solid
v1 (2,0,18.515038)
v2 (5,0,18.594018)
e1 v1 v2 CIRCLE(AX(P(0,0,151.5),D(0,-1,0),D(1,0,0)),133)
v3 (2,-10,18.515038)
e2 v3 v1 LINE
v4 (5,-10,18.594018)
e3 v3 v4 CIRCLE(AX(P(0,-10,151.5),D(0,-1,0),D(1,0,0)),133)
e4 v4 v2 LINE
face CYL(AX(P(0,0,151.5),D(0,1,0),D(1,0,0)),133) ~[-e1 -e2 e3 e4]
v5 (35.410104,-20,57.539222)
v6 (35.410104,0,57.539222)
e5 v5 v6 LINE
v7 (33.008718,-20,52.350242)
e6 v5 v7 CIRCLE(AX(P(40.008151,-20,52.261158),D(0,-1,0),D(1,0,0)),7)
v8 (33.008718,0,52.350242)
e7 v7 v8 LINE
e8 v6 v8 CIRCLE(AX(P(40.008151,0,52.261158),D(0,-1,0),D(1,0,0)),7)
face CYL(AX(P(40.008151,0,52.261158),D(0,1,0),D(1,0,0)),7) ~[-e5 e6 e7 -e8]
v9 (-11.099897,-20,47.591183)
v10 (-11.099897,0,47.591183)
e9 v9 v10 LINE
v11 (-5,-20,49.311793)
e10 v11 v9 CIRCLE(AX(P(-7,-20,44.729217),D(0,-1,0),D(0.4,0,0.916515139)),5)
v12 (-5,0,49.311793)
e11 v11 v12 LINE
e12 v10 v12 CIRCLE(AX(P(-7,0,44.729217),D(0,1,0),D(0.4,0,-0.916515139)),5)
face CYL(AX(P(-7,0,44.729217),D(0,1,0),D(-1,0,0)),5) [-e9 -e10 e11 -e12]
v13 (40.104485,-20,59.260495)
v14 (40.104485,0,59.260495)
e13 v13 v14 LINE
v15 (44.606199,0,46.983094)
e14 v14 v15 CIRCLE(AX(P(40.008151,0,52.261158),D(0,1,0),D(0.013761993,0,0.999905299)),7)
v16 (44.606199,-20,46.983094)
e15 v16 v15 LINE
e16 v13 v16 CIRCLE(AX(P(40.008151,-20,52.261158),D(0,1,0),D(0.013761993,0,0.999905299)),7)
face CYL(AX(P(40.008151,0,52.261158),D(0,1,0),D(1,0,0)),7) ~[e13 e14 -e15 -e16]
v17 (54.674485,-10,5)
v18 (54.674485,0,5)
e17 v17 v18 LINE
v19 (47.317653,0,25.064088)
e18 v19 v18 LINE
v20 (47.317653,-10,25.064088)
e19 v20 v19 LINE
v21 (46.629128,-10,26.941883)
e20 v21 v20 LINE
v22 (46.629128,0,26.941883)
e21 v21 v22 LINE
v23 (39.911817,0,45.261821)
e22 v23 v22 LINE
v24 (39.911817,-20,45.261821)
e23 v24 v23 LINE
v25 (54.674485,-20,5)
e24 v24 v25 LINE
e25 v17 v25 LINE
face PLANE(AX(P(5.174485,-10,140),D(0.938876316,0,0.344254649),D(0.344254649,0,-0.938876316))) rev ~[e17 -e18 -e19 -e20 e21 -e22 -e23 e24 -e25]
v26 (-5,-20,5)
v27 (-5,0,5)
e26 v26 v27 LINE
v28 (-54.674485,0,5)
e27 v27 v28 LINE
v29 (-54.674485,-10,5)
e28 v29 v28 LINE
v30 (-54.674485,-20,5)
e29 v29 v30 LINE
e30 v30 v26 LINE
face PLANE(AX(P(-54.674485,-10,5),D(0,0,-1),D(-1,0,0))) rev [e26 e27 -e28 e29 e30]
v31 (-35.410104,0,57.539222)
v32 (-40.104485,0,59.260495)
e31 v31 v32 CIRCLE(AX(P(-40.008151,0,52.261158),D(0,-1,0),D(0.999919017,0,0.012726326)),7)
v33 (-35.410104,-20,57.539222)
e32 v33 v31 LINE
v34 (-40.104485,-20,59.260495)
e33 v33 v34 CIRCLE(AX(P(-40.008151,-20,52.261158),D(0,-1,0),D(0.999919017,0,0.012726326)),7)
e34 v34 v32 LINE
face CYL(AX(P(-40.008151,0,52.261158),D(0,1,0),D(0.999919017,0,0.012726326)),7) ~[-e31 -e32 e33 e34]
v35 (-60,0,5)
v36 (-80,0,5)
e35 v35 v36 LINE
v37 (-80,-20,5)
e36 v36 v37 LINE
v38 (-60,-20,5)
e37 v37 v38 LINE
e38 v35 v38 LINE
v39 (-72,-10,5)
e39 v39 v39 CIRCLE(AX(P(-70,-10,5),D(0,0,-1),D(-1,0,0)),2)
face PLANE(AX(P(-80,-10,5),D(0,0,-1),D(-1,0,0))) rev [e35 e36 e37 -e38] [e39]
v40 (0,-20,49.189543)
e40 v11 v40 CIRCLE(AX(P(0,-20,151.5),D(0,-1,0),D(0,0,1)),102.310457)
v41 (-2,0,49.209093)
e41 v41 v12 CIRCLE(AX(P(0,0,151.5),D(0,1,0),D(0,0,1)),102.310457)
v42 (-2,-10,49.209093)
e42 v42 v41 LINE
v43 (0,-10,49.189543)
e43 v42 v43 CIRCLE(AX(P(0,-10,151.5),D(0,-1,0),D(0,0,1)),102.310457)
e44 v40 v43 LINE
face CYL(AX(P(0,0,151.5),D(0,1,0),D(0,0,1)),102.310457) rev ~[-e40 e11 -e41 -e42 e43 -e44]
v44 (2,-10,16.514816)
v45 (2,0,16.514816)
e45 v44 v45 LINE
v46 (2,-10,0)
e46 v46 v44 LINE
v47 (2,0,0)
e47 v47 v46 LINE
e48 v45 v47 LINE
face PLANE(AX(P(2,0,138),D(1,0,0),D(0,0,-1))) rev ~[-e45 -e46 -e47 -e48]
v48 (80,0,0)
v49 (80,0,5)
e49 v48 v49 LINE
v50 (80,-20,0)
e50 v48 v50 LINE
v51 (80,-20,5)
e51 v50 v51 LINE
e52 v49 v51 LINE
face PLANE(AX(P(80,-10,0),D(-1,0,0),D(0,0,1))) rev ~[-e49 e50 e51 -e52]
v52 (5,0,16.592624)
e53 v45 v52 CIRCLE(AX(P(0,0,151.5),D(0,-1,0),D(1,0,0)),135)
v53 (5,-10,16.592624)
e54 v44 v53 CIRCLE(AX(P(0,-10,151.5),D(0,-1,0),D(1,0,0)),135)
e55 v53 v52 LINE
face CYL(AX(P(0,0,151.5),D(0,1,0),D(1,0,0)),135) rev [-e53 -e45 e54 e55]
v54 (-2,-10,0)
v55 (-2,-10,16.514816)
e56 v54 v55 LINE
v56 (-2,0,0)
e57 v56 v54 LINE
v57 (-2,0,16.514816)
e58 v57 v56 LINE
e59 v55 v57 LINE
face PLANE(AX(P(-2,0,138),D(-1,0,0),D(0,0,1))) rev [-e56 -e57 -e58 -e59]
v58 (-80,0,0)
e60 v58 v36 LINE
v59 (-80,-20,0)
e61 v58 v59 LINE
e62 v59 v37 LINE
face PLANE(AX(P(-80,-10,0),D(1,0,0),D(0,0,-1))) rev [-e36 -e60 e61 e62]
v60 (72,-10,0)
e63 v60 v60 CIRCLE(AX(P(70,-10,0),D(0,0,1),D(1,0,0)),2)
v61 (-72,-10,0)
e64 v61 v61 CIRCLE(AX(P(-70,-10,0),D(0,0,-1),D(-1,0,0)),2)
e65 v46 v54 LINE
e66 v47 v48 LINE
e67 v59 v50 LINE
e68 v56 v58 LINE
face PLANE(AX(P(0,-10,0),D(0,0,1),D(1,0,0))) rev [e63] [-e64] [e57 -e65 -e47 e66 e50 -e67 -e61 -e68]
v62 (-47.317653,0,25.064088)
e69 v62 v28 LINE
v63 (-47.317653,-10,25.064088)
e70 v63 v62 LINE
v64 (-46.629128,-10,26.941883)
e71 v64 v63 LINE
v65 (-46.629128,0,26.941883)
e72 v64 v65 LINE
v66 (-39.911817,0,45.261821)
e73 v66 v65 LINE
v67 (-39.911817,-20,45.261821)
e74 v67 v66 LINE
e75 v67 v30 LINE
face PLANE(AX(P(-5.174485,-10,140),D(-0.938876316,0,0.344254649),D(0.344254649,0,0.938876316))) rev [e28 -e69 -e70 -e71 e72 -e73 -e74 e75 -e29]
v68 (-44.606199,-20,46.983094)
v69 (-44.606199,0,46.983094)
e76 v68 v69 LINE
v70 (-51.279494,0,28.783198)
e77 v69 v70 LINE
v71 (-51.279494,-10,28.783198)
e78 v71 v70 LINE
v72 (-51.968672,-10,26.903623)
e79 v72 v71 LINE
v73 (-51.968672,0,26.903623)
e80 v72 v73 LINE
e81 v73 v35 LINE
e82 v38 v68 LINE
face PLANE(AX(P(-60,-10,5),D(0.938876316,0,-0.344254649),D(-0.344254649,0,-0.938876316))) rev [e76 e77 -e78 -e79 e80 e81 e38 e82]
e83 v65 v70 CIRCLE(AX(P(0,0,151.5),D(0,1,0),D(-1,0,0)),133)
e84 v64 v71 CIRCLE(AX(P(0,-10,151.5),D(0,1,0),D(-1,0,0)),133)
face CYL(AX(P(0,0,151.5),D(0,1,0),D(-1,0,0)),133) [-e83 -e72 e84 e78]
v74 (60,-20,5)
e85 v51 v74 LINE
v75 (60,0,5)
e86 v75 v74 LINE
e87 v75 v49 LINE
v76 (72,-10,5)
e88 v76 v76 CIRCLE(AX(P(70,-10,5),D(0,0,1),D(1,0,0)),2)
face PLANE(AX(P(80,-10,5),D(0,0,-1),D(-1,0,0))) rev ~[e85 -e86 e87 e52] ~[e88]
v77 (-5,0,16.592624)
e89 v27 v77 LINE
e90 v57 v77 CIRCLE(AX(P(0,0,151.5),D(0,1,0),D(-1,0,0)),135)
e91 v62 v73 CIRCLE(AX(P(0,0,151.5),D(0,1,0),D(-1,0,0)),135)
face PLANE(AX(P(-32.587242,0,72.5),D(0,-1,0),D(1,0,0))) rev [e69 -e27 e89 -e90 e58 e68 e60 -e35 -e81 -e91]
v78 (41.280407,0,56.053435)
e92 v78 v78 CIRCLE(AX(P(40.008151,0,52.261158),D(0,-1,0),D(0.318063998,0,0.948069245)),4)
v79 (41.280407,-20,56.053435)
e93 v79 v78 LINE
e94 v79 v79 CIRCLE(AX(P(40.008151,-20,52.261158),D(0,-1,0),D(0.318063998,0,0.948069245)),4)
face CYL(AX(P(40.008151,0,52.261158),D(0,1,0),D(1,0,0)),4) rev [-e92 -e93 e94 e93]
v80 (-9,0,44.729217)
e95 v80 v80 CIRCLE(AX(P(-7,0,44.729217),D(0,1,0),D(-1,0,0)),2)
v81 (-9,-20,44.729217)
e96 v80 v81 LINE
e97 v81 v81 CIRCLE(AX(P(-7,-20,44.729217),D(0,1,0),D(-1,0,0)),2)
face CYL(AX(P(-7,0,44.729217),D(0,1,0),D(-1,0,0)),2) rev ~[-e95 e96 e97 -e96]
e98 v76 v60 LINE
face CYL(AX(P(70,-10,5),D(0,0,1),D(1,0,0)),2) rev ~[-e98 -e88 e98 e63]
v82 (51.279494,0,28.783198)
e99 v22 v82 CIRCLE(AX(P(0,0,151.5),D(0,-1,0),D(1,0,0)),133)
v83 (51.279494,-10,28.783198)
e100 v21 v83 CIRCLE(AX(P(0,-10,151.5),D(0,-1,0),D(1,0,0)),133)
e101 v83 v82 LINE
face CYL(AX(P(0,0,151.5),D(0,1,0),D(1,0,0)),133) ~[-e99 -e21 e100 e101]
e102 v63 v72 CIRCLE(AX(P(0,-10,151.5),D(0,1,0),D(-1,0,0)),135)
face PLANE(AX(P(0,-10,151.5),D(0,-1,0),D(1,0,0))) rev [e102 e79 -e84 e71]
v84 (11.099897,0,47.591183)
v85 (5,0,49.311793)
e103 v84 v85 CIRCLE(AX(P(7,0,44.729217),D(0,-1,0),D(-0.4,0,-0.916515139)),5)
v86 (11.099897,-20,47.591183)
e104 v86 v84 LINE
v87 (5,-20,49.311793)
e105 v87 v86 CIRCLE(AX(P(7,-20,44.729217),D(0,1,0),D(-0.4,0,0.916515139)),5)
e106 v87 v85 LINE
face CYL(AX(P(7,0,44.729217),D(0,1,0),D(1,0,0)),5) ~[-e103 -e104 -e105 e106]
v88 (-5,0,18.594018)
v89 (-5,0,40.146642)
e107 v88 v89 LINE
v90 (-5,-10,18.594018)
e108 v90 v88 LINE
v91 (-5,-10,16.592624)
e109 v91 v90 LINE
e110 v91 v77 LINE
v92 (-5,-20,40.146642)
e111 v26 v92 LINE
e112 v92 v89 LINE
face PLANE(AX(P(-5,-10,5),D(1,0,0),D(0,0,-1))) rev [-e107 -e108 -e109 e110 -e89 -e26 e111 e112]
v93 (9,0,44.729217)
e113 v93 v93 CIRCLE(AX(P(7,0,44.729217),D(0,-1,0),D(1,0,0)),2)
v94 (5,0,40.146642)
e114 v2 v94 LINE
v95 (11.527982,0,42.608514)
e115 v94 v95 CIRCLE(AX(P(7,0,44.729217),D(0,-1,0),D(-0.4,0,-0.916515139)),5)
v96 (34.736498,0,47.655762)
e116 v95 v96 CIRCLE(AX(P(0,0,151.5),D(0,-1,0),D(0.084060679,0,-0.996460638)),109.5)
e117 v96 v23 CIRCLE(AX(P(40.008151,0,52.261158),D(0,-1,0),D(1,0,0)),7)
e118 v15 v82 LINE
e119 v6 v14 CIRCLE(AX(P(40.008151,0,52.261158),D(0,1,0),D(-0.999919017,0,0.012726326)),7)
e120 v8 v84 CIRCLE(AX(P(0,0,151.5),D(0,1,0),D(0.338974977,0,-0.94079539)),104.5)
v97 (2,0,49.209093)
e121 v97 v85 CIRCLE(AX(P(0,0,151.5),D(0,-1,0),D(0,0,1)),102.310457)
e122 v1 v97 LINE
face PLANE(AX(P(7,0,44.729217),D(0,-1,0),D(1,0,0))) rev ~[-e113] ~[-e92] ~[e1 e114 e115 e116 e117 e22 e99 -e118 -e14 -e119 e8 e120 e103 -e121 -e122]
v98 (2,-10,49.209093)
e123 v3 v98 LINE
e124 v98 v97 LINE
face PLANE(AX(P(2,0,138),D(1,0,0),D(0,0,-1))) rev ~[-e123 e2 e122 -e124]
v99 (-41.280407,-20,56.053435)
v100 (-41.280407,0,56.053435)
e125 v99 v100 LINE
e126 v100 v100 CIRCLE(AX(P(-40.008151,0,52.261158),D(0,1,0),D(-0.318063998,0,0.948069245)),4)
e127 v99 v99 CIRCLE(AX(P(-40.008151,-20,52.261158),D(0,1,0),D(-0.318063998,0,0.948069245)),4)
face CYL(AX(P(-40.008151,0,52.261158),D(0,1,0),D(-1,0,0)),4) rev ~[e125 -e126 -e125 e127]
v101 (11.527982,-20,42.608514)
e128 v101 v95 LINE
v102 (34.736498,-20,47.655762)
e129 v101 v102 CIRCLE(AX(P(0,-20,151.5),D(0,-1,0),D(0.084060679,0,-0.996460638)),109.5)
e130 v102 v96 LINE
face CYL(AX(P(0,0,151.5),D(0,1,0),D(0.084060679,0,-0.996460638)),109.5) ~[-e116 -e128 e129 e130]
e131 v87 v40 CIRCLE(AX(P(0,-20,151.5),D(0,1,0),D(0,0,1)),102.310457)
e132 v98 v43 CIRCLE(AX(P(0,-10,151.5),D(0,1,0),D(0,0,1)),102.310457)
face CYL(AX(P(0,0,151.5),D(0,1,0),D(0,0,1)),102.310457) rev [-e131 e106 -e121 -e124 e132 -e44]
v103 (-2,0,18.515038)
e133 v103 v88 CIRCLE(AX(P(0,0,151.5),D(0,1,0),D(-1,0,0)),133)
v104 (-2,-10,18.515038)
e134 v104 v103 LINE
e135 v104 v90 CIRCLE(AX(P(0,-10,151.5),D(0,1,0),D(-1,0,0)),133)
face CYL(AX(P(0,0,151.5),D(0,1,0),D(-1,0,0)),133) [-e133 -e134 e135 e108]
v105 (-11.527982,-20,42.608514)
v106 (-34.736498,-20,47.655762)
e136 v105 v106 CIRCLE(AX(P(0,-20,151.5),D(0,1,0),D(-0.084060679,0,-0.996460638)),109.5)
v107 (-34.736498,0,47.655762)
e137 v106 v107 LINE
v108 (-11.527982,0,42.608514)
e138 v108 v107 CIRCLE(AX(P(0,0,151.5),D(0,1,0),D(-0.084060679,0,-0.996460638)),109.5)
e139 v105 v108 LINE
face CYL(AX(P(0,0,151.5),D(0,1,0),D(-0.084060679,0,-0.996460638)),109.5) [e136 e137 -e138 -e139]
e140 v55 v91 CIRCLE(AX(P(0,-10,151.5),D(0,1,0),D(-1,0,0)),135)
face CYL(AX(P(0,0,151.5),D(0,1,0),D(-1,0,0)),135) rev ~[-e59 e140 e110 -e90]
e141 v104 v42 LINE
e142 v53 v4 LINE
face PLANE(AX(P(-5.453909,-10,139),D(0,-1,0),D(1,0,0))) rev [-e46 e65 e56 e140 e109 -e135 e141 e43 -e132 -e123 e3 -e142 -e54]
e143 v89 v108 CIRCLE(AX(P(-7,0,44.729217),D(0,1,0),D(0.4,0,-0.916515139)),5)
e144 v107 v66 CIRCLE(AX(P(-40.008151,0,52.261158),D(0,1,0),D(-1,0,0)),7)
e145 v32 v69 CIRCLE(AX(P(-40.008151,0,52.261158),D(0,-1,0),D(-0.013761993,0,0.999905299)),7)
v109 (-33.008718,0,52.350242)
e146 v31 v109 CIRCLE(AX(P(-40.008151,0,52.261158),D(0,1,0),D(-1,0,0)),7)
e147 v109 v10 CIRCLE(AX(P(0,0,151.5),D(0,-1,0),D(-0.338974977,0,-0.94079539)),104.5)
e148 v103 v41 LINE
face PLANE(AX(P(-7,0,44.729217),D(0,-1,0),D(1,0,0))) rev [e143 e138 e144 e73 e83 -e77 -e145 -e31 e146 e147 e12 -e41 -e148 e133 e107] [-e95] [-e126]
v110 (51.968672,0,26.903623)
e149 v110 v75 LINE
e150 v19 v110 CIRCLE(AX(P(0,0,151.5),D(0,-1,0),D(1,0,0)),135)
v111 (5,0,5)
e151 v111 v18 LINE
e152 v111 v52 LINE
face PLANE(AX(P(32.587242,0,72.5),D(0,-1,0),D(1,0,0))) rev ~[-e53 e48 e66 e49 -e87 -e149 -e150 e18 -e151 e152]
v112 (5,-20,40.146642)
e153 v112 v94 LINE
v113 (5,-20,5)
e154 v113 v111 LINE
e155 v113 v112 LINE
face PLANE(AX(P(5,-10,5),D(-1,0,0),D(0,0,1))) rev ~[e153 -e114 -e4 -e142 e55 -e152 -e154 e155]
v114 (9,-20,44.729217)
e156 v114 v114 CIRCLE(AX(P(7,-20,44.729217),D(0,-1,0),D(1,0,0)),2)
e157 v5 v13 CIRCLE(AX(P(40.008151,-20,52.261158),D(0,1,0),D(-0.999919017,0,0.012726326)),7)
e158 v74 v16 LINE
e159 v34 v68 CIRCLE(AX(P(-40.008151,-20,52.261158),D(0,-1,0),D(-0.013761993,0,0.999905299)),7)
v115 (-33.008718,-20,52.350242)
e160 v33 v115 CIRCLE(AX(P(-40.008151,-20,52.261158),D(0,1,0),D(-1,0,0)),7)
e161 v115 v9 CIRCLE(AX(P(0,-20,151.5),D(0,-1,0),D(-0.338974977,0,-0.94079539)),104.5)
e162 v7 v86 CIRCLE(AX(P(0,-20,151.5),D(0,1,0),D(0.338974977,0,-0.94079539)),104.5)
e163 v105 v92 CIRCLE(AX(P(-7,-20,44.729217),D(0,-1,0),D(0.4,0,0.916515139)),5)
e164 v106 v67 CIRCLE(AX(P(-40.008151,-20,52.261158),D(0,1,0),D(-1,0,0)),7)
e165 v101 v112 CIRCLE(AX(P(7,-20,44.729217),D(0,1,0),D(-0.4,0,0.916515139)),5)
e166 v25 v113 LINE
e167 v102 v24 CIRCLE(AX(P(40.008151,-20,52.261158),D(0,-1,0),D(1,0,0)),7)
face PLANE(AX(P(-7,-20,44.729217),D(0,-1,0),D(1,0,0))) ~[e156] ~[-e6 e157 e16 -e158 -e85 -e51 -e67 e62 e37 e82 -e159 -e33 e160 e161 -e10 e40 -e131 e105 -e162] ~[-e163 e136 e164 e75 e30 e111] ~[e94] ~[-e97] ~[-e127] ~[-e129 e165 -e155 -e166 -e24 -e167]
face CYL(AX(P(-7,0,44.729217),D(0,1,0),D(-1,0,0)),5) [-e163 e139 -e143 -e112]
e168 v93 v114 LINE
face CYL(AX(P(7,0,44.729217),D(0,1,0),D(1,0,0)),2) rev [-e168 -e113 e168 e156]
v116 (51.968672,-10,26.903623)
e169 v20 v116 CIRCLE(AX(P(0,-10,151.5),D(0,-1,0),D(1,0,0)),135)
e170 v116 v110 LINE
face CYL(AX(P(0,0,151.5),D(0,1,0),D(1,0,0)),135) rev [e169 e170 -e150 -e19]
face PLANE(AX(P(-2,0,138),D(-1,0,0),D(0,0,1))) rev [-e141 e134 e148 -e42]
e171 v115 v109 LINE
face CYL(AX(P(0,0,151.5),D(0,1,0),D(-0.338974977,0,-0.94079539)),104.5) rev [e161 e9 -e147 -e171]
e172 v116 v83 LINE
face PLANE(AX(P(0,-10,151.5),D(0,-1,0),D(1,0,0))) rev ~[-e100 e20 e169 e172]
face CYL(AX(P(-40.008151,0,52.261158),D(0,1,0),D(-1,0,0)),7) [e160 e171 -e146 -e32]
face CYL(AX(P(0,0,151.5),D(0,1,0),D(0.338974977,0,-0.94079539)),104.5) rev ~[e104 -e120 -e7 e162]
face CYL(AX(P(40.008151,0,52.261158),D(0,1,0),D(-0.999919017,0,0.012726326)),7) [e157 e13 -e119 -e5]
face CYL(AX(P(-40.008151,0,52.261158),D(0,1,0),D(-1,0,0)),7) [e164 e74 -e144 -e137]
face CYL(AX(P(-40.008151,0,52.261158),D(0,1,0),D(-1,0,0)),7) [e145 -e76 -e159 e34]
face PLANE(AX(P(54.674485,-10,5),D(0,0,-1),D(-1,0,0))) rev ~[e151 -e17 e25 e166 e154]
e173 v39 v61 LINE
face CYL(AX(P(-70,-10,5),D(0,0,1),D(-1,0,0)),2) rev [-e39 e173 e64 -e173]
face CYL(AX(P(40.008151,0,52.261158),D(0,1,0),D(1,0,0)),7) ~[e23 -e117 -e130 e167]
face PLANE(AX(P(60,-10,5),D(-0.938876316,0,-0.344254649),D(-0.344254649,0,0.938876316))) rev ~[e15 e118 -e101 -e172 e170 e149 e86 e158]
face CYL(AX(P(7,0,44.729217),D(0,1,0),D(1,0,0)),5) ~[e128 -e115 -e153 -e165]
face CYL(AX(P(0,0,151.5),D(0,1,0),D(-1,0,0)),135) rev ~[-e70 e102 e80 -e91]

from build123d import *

# Parameters (mm, degrees)
F1_W      = 80
F1_H      = 5
F2_DEPTH  = 10
F3_W      = 5
F3_H      = 151.5
F4_DEPTH  = 10
F5_W      = 21
F5_H      = 23
F6_DEPTH  = 10
F8_DEPTH  = 10
F10_DEPTH = 10
F12_DEPTH = 10
F14_DEPTH = 20
F15_W     = 0.9078182304
F15_H     = 2
F16_DEPTH = 10
F17_R     = 135
F17_R_2   = 133
F18_DEPTH = 10
F19_R     = 7
F19_R_2   = 4
F20_DEPTH = 20
F21_R     = 4
F22_DEPTH = 20.001
F23_R     = 5
F23_R_2   = 2
F24_DEPTH = 20
F26_DEPTH = 20
F28_DEPTH = 20.001
F29_R     = 2
F30_DEPTH = 5.001


# Not quite as in the source:
# - ends of sketch curves that miss each other by under 0.0002 mm in the source are joined


with BuildPart() as f2:
    # F1 (on Front) → F2 (new body)
    with BuildSketch(Plane.XZ):
        with Locations((40, 2.5)):
            Rectangle(F1_W, F1_H)
    extrude(amount=F2_DEPTH)

    # F3 (on Front) → F4 (join, through all)
    with BuildSketch(Plane.XZ):
        with Locations((2.5, 75.75)):
            Rectangle(F3_W, F3_H)
    extrude(amount=F4_DEPTH)

    # F5 (on Front) → F6 (join, through all)
    with BuildSketch(Plane.XZ):
        with Locations((10.5, 151.5)):
            Rectangle(F5_W, F5_H)
    extrude(amount=F6_DEPTH)

    # F7 (on Front) → F8 (join, through all)
    with BuildSketch(Plane.XZ):
        Polygon((60, 5), (9.8688664765, 141.7212732458), (5.1744848971, 140), (55.3056184206, 3.2787267542), align=None)
    extrude(amount=F8_DEPTH)

    # F9 (on face) → F10 (join)
    with BuildSketch(Plane.XZ.offset(10)):
        Polygon((0, 163), (0, 0), (80, 0), (80, 5), (60, 5), (10.5, 140), (21, 140), (21, 163), align=None)
        Polygon((5.1744848971, 140), (54.6744848971, 5), (5, 5), (5, 140), align=None, mode=Mode.SUBTRACT)
    extrude(amount=F10_DEPTH)

    # F11 (on face) → F12 (cut)
    with BuildSketch(Plane(origin=(0, 0, 0), x_dir=(-1, 0, 0), z_dir=(0, 1, 0))):
        Polygon((-2, 0), (0, 0), (0, 140), (-21, 140), (-21, 138), (-2, 138), align=None)
    extrude(amount=-F12_DEPTH, mode=Mode.SUBTRACT)

    # F13 (on face) → F14 (join)
    with BuildSketch(Plane(origin=(0, 0, 0), x_dir=(-1, 0, 0), z_dir=(0, 1, 0))):
        Polygon((-2, 133), (-2, 138), (-11.2333333333, 138), (-13.0666666667, 133), align=None)
    extrude(amount=-F14_DEPTH)

    # F15 (on face) → F16 (join)
    with BuildSketch(Plane.XZ.offset(20)):
        with Locations((5.4539091152, 139)):
            Rectangle(F15_W, F15_H)
    extrude(amount=-F16_DEPTH)

    # F17 (on Front) → F18 (cut)
    with BuildSketch(Plane.XZ):
        with Locations((0, 151.5)):
            Circle(F17_R)
        with Locations((0, 151.5)):
            Circle(F17_R_2, mode=Mode.SUBTRACT)
    extrude(amount=F18_DEPTH, mode=Mode.SUBTRACT)

    # F19 (on Front) → F20 (join, through all)
    with BuildSketch(Plane.XZ):
        with Locations((40.0081513066, 52.2611576598)):
            Circle(F19_R)
        with Locations((40.0081513066, 52.2611576598)):
            Circle(F19_R_2, mode=Mode.SUBTRACT)
    extrude(amount=F20_DEPTH)

    # F21 (on Front) → F22 (cut, through all)
    with BuildSketch(Plane.XZ):
        with Locations((40.0081513066, 52.2611576598)):
            Circle(F21_R)
    extrude(amount=F22_DEPTH, mode=Mode.SUBTRACT)

    # F23 (on Front) → F24 (join, through all)
    with BuildSketch(Plane.XZ):
        with Locations((7, 44.7292174797)):
            Circle(F23_R)
        with Locations((7, 44.7292174797)):
            Circle(F23_R_2, mode=Mode.SUBTRACT)
    extrude(amount=F24_DEPTH)

    # F25 (on Front) → F26 (join, through all)
    with BuildSketch(Plane.XZ):
        with BuildLine():
            Line((8.7843409429, 47.3698633718), (8.9944926401, 44.8787117779))
            ThreePointArc((8.9944926401, 44.8787117779), (22.8274604253, 46.9633698145), (36.2703225327, 50.8348933176))
            Line((36.2703225327, 50.8348933176), (35.4228850903, 53.1868817915))
            ThreePointArc((35.4228850903, 53.1868817915), (22.294150224, 49.4058235462), (8.7843409429, 47.3698633718))
        make_face()
        with BuildLine():
            ThreePointArc((36.2703225327, 50.8348933176), (22.8274604253, 46.9633698145), (8.9944055882, 44.8787044343))
            Line((8.9944055882, 44.8787044343), (9.2046443373, 42.3875601839))
            ThreePointArc((9.2046443373, 42.3875601839), (23.3608559764, 44.5209347206), (37.117759975, 48.4829048437))
            Line((37.117759975, 48.4829048437), (36.2703225327, 50.8348933176))
        make_face()
    extrude(amount=F26_DEPTH)

    # F27 (on Front) → F28 (cut, through all)
    with BuildSketch(Plane.XZ):
        with BuildLine():
            ThreePointArc((5, 49.3117931746), (8.3573933592, 49.5414397593), (11.0998968806, 47.5911828128))
            ThreePointArc((11.0998968806, 47.5911828128), (22.1823046987, 49.3814641789), (33.0087181874, 52.3502419386))
            ThreePointArc((33.0087181874, 52.3502419386), (38.6064619078, 59.1193838757), (46.4113234148, 55.0894764101))
            ThreePointArc((46.4113234148, 55.0894764101), (104.3190443402, 175.3020374745), (0, 258.5))
            Line((0, 258.5), (0, 253.8104570129))
            ThreePointArc((0, 253.8104570129), (-102.2798898997, 148.9992528562), (5, 49.3117931746))
        make_face()
    extrude(amount=F28_DEPTH, mode=Mode.SUBTRACT)

    # F29 (on face) → F30 (cut, through all)
    with BuildSketch(Plane.XY.offset(5)):
        with Locations((70, -10)):
            Circle(F29_R)
    extrude(amount=-F30_DEPTH, mode=Mode.SUBTRACT)

    # F31: F2 across plane


with BuildPart() as f2_1:
    add(f2.part)
    add(f2.part.mirror(Plane.YZ))


solid = f2_1.part
